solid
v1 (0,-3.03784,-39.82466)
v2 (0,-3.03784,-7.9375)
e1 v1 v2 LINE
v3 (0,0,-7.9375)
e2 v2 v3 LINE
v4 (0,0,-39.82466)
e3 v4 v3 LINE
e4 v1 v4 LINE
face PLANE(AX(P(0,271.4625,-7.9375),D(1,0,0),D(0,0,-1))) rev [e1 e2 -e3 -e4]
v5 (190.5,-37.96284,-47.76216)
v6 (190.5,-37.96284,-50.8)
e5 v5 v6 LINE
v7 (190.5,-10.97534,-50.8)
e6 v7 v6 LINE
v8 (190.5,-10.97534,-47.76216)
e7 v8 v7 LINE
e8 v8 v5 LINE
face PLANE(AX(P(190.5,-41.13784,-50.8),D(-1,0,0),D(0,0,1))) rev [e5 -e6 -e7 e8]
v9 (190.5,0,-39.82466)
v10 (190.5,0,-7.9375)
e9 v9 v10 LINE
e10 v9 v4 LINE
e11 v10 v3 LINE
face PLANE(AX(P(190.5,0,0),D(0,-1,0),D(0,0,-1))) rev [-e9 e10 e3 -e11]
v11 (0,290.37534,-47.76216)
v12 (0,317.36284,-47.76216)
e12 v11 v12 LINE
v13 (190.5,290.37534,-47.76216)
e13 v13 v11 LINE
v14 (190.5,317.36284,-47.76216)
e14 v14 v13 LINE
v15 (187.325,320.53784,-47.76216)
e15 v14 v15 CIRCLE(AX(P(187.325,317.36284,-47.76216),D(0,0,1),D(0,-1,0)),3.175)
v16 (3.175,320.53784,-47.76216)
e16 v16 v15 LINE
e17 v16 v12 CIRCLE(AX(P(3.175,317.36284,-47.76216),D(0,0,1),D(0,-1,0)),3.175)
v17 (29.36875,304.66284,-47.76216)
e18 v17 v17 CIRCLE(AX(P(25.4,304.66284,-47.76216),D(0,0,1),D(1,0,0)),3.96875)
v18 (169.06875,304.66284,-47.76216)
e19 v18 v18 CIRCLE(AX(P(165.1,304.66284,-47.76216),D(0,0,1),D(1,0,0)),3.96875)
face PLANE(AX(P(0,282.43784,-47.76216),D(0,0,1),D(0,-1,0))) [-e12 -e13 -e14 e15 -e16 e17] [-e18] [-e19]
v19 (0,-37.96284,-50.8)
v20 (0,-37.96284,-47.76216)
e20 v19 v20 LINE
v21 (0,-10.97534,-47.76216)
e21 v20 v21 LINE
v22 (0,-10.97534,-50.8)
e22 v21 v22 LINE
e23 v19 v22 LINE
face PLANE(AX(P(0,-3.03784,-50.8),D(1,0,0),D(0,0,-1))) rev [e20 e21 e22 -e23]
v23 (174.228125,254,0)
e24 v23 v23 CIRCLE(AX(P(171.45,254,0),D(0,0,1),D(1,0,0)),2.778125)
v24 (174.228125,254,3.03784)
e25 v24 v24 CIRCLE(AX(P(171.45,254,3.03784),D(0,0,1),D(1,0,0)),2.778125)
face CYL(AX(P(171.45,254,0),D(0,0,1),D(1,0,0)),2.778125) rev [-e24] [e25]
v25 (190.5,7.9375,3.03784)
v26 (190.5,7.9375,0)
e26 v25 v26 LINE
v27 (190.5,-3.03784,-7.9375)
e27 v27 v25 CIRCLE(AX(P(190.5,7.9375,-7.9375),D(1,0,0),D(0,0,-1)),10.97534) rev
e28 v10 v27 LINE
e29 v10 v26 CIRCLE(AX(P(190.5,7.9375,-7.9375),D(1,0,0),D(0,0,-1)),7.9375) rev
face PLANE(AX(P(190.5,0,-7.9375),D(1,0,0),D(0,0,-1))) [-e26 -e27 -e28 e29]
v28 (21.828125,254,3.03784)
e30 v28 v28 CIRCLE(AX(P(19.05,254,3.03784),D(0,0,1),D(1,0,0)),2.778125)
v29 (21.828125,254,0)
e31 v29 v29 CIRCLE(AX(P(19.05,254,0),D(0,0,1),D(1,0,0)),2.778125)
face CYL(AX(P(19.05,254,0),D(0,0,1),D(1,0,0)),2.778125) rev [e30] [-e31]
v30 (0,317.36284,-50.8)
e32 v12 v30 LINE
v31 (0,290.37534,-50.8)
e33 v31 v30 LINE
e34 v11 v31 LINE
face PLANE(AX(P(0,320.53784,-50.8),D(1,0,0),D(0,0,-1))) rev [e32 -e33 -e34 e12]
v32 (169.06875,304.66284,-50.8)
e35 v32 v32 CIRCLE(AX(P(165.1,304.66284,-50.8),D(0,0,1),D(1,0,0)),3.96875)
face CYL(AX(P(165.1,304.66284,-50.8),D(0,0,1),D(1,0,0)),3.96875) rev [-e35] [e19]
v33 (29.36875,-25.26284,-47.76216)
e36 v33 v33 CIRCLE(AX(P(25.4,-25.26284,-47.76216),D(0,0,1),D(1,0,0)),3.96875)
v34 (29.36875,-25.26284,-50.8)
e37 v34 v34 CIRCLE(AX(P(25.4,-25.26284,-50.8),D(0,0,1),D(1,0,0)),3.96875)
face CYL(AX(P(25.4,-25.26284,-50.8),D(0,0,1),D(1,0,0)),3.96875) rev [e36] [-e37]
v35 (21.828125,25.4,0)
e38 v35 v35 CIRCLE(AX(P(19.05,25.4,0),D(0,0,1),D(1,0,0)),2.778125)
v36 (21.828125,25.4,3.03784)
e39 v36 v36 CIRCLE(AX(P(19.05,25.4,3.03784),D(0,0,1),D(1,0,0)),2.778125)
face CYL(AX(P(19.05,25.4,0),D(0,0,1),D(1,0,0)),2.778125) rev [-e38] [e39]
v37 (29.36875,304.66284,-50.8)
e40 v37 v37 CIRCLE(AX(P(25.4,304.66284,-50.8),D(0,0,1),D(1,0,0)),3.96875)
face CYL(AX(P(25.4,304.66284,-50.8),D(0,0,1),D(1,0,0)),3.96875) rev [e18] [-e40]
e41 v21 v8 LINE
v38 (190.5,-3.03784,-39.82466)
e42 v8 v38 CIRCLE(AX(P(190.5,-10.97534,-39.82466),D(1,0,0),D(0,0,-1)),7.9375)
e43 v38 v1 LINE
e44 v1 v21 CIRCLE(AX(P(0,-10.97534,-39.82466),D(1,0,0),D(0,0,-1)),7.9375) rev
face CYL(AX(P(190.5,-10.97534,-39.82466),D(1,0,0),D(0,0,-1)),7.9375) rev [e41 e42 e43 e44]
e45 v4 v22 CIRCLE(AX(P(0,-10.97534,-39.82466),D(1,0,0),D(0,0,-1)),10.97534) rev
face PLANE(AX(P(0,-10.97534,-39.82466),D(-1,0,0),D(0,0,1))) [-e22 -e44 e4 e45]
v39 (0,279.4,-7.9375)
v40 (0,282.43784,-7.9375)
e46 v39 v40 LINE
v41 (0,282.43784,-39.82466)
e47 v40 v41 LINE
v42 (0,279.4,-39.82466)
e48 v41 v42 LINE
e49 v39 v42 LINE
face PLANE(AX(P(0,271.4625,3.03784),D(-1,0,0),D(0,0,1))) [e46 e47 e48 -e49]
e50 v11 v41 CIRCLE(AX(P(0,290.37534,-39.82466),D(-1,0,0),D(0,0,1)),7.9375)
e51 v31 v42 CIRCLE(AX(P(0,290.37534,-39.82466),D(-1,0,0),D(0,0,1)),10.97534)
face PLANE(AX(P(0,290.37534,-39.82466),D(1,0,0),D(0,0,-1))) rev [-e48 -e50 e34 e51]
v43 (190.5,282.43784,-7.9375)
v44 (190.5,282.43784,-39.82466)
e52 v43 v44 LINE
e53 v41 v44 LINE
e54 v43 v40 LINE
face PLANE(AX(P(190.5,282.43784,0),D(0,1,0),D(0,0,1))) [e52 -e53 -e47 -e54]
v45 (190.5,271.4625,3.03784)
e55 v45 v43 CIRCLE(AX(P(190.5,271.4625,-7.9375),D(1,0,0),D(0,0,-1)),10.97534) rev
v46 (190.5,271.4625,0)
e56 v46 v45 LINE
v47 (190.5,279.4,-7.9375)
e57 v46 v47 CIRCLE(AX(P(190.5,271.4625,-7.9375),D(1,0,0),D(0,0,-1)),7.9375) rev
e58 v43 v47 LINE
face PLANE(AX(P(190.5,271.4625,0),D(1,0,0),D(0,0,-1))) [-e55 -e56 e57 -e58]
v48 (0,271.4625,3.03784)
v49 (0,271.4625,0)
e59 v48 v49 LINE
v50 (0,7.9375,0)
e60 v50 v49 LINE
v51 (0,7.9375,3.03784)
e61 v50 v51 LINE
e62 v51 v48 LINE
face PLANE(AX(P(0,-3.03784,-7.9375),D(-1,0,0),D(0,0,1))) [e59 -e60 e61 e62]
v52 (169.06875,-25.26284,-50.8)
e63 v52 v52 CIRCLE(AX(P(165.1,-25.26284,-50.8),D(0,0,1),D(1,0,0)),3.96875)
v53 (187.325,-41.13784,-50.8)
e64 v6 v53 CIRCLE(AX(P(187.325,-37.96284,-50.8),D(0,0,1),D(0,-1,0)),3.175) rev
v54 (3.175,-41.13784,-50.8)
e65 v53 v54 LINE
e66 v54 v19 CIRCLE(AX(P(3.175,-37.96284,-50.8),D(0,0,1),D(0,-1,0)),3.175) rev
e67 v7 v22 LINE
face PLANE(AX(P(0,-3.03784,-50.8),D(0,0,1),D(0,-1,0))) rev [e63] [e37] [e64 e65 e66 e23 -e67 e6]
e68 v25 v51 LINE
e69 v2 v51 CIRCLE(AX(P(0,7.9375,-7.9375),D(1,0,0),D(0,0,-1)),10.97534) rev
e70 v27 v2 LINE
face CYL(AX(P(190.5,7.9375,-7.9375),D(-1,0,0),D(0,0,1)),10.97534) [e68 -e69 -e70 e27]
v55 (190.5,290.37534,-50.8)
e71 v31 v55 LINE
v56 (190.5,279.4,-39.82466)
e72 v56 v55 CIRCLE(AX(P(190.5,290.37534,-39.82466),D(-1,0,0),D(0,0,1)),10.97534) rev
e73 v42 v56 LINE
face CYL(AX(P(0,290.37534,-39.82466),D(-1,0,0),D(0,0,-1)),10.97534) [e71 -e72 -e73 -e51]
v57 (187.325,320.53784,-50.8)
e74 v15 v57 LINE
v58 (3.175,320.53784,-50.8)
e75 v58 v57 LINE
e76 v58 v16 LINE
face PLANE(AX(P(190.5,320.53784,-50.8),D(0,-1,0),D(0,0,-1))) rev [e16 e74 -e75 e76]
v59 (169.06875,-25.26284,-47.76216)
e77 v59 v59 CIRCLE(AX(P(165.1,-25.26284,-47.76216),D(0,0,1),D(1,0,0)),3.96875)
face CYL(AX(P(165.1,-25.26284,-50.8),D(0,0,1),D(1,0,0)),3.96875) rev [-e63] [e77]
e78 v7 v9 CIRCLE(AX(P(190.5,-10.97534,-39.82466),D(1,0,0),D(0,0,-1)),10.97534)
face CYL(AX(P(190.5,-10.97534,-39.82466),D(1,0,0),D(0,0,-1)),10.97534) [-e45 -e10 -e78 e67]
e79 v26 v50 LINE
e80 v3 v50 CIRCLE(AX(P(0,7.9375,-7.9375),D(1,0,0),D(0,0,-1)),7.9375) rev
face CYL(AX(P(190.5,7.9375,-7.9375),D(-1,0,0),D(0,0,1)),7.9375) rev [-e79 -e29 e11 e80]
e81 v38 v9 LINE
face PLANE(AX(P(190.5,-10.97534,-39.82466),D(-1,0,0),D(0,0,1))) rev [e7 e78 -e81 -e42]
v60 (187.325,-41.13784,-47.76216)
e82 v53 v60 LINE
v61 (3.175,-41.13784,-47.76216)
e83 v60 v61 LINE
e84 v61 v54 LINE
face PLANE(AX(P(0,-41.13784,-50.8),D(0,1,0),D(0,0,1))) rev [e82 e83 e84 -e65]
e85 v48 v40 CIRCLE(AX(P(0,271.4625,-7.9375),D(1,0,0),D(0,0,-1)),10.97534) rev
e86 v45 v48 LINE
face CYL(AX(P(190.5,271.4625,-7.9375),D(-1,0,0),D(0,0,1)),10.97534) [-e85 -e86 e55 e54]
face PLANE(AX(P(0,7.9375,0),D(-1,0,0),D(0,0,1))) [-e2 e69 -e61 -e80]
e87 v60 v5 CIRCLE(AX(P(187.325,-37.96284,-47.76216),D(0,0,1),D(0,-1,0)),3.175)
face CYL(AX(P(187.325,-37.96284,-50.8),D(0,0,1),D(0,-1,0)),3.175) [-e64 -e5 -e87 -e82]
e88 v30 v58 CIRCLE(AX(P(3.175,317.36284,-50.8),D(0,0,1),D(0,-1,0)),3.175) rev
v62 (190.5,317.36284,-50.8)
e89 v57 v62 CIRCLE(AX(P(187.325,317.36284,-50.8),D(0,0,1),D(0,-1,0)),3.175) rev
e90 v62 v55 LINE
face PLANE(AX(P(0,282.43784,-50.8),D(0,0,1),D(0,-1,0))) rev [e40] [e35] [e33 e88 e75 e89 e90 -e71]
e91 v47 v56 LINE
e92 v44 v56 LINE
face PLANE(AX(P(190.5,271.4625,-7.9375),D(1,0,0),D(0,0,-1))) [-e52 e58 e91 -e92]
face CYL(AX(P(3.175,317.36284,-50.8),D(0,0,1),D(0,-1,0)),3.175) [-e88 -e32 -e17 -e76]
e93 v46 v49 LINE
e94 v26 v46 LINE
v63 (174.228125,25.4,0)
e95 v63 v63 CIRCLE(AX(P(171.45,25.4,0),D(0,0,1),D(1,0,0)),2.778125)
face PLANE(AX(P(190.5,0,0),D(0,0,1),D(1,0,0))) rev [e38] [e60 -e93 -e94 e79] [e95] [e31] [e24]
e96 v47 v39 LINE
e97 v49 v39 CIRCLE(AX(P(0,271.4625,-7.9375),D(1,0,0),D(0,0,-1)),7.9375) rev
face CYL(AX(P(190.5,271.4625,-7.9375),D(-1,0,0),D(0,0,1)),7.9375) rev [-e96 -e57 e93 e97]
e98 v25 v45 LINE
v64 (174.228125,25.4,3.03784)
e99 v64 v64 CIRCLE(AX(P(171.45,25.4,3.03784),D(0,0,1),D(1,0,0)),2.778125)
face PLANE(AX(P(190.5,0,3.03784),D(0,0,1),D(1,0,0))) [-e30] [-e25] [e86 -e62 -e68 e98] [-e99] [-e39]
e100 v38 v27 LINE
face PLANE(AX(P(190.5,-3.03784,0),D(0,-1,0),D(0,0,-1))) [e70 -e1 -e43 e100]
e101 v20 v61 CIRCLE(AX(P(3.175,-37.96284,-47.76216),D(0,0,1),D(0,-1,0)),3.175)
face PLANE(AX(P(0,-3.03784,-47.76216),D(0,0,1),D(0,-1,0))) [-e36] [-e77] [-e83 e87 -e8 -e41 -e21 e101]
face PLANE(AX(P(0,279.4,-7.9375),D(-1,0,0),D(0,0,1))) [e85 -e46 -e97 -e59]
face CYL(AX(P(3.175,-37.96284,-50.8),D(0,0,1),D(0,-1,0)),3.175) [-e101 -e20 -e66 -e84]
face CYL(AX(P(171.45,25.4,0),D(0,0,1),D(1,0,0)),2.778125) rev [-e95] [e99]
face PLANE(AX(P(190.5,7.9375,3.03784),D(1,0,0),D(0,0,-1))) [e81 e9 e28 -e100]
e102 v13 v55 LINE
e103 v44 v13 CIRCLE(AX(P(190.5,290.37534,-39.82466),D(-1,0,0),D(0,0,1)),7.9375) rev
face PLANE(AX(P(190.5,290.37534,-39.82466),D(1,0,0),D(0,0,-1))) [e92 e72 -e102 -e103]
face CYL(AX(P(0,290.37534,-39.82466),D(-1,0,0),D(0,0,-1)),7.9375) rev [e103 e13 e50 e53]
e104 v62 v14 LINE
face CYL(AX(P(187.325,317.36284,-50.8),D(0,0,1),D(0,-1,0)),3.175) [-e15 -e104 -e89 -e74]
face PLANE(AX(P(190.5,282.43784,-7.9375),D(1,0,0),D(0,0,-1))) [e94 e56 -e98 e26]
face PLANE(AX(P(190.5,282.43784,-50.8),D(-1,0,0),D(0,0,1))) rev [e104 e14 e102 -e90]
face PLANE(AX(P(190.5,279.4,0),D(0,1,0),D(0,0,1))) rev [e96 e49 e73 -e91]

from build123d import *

# Parameters (mm, degrees)
BASE_FLANGE1_DEPTH           = 190.5
SKETCH3_R                    = 2.778125
CUT_EXTRUDE1_DEPTH           = 3.03784
EDGE_FLANGE1_STRIP_W         = 28.02636
EDGE_FLANGE1_STRIP_H         = 3.03784
EDGE_FLANGE1_STRIP_CUT_DEPTH = 190.5
EDGE_FLANGE1_DEPTH           = 190.5
EDGE_FLANGE2_STRIP_W         = 28.02636
EDGE_FLANGE2_STRIP_H         = 3.03784
EDGE_FLANGE2_STRIP_CUT_DEPTH = 190.5
EDGE_FLANGE2_DEPTH           = 190.5
FILLET1_R                    = 3.175
SKETCH12_R                   = 3.96875
CUT_EXTRUDE2_DEPTH           = 3.03784


# Sheet-metal steps are written as plain solids
with BuildPart() as part:
    # Sketch1 → Base-Flange1 (new body)
    with BuildSketch(Plane(origin=(0, 0, 0), x_dir=(0, 0, -1), z_dir=(1, 0, 0))):
        with BuildLine():
            Line((50.8, 279.4), (7.9375, 279.4))
            ThreePointArc((7.9375, 279.4), (2.324839924, 277.075160076), (0, 271.4625))
            Line((0, 271.4625), (0, 7.9375))
            ThreePointArc((0, 7.9375), (2.324839924, 2.324839924), (7.9375, 0))
            Line((7.9375, 0), (50.8, 0))
            Line((50.8, 0), (50.8, -3.03784))
            Line((50.8, -3.03784), (7.9375, -3.03784))
            ThreePointArc((7.9375, -3.03784), (0.17676266, 0.17676266), (-3.03784, 7.9375))
            Line((-3.03784, 7.9375), (-3.03784, 271.4625))
            ThreePointArc((-3.03784, 271.4625), (0.17676266, 279.22323734), (7.9375, 282.43784))
            Line((7.9375, 282.43784), (50.8, 282.43784))
            Line((50.8, 282.43784), (50.8, 279.4))
        make_face()
    extrude(amount=BASE_FLANGE1_DEPTH)

    # Sketch3 → Cut-Extrude1 (cut)
    with BuildSketch(Plane.XY.offset(3.03784)):
        with Locations((171.45, 254)):
            Circle(SKETCH3_R)
        with Locations((19.05, 254)):
            Circle(SKETCH3_R)
        with Locations((171.45, 25.4)):
            Circle(SKETCH3_R)
        with Locations((19.05, 25.4)):
            Circle(SKETCH3_R)
    extrude(amount=-CUT_EXTRUDE1_DEPTH, mode=Mode.SUBTRACT)

    # Edge-Flange1 strip (across the edge) → Edge-Flange1 strip cut (cut)
    with BuildSketch(Plane(origin=(0, -3.03784, -50.8), x_dir=(0, 0, 1), z_dir=(1, 0, 0))):
        with Locations((-3.03784, -1.51892)):
            Rectangle(EDGE_FLANGE1_STRIP_W, EDGE_FLANGE1_STRIP_H)
    extrude(amount=EDGE_FLANGE1_STRIP_CUT_DEPTH, mode=Mode.SUBTRACT)

    # Edge-Flange1 section (across the edge) → Edge-Flange1 (add)
    with BuildSketch(Plane(origin=(0, -3.03784, -50.8), x_dir=(0, 0, 1), z_dir=(1, 0, 0))):
        with BuildLine():
            Line((0, 7.9375), (0, 38.1))
            Line((0, 38.1), (3.03784, 38.1))
            Line((3.03784, 38.1), (3.03784, 7.9375))
            ThreePointArc((3.03784, 7.9375), (5.362679924, 2.324839924), (10.97534, 0))
            Line((10.97534, 0), (10.97534, -3.03784))
            ThreePointArc((10.97534, -3.03784), (3.21460266, 0.17676266), (0, 7.9375))
        make_face()
    extrude(amount=EDGE_FLANGE1_DEPTH)

    # Edge-Flange2 strip (across the edge) → Edge-Flange2 strip cut (cut)
    with BuildSketch(Plane(origin=(190.5, 282.43784, -50.8), x_dir=(0, 0, 1), z_dir=(-1, 0, 0))):
        with Locations((-3.03784, -1.51892)):
            Rectangle(EDGE_FLANGE2_STRIP_W, EDGE_FLANGE2_STRIP_H)
    extrude(amount=EDGE_FLANGE2_STRIP_CUT_DEPTH, mode=Mode.SUBTRACT)

    # Edge-Flange2 section (across the edge) → Edge-Flange2 (add)
    with BuildSketch(Plane(origin=(190.5, 282.43784, -50.8), x_dir=(0, 0, 1), z_dir=(-1, 0, 0))):
        with BuildLine():
            Line((0, 7.9375), (0, 38.1))
            Line((0, 38.1), (3.03784, 38.1))
            Line((3.03784, 38.1), (3.03784, 7.9375))
            ThreePointArc((3.03784, 7.9375), (5.362679924, 2.324839924), (10.97534, 0))
            Line((10.97534, 0), (10.97534, -3.03784))
            ThreePointArc((10.97534, -3.03784), (3.21460266, 0.17676266), (0, 7.9375))
        make_face()
    extrude(amount=EDGE_FLANGE2_DEPTH)

    # Fillet1
    fillet1_edges = [part.edges().sort_by_distance(p)[0] for p in [
        (190.5, 320.53784, -49.28108),
        (0, 320.53784, -49.28108),
        (0, -41.13784, -49.28108),
        (190.5, -41.13784, -49.28108),
    ]]
    fillet(fillet1_edges, radius=FILLET1_R)

    # Sketch12 → Cut-Extrude2 (cut)
    with BuildSketch(Plane.XY.offset(-47.76216)):
        with Locations((25.4, 304.66284)):
            Circle(SKETCH12_R)
        with Locations((165.1, 304.66284)):
            Circle(SKETCH12_R)
        with Locations((165.1, -25.26284)):
            Circle(SKETCH12_R)
        with Locations((25.4, -25.26284)):
            Circle(SKETCH12_R)
    extrude(amount=-CUT_EXTRUDE2_DEPTH, mode=Mode.SUBTRACT)


solid = part.part
